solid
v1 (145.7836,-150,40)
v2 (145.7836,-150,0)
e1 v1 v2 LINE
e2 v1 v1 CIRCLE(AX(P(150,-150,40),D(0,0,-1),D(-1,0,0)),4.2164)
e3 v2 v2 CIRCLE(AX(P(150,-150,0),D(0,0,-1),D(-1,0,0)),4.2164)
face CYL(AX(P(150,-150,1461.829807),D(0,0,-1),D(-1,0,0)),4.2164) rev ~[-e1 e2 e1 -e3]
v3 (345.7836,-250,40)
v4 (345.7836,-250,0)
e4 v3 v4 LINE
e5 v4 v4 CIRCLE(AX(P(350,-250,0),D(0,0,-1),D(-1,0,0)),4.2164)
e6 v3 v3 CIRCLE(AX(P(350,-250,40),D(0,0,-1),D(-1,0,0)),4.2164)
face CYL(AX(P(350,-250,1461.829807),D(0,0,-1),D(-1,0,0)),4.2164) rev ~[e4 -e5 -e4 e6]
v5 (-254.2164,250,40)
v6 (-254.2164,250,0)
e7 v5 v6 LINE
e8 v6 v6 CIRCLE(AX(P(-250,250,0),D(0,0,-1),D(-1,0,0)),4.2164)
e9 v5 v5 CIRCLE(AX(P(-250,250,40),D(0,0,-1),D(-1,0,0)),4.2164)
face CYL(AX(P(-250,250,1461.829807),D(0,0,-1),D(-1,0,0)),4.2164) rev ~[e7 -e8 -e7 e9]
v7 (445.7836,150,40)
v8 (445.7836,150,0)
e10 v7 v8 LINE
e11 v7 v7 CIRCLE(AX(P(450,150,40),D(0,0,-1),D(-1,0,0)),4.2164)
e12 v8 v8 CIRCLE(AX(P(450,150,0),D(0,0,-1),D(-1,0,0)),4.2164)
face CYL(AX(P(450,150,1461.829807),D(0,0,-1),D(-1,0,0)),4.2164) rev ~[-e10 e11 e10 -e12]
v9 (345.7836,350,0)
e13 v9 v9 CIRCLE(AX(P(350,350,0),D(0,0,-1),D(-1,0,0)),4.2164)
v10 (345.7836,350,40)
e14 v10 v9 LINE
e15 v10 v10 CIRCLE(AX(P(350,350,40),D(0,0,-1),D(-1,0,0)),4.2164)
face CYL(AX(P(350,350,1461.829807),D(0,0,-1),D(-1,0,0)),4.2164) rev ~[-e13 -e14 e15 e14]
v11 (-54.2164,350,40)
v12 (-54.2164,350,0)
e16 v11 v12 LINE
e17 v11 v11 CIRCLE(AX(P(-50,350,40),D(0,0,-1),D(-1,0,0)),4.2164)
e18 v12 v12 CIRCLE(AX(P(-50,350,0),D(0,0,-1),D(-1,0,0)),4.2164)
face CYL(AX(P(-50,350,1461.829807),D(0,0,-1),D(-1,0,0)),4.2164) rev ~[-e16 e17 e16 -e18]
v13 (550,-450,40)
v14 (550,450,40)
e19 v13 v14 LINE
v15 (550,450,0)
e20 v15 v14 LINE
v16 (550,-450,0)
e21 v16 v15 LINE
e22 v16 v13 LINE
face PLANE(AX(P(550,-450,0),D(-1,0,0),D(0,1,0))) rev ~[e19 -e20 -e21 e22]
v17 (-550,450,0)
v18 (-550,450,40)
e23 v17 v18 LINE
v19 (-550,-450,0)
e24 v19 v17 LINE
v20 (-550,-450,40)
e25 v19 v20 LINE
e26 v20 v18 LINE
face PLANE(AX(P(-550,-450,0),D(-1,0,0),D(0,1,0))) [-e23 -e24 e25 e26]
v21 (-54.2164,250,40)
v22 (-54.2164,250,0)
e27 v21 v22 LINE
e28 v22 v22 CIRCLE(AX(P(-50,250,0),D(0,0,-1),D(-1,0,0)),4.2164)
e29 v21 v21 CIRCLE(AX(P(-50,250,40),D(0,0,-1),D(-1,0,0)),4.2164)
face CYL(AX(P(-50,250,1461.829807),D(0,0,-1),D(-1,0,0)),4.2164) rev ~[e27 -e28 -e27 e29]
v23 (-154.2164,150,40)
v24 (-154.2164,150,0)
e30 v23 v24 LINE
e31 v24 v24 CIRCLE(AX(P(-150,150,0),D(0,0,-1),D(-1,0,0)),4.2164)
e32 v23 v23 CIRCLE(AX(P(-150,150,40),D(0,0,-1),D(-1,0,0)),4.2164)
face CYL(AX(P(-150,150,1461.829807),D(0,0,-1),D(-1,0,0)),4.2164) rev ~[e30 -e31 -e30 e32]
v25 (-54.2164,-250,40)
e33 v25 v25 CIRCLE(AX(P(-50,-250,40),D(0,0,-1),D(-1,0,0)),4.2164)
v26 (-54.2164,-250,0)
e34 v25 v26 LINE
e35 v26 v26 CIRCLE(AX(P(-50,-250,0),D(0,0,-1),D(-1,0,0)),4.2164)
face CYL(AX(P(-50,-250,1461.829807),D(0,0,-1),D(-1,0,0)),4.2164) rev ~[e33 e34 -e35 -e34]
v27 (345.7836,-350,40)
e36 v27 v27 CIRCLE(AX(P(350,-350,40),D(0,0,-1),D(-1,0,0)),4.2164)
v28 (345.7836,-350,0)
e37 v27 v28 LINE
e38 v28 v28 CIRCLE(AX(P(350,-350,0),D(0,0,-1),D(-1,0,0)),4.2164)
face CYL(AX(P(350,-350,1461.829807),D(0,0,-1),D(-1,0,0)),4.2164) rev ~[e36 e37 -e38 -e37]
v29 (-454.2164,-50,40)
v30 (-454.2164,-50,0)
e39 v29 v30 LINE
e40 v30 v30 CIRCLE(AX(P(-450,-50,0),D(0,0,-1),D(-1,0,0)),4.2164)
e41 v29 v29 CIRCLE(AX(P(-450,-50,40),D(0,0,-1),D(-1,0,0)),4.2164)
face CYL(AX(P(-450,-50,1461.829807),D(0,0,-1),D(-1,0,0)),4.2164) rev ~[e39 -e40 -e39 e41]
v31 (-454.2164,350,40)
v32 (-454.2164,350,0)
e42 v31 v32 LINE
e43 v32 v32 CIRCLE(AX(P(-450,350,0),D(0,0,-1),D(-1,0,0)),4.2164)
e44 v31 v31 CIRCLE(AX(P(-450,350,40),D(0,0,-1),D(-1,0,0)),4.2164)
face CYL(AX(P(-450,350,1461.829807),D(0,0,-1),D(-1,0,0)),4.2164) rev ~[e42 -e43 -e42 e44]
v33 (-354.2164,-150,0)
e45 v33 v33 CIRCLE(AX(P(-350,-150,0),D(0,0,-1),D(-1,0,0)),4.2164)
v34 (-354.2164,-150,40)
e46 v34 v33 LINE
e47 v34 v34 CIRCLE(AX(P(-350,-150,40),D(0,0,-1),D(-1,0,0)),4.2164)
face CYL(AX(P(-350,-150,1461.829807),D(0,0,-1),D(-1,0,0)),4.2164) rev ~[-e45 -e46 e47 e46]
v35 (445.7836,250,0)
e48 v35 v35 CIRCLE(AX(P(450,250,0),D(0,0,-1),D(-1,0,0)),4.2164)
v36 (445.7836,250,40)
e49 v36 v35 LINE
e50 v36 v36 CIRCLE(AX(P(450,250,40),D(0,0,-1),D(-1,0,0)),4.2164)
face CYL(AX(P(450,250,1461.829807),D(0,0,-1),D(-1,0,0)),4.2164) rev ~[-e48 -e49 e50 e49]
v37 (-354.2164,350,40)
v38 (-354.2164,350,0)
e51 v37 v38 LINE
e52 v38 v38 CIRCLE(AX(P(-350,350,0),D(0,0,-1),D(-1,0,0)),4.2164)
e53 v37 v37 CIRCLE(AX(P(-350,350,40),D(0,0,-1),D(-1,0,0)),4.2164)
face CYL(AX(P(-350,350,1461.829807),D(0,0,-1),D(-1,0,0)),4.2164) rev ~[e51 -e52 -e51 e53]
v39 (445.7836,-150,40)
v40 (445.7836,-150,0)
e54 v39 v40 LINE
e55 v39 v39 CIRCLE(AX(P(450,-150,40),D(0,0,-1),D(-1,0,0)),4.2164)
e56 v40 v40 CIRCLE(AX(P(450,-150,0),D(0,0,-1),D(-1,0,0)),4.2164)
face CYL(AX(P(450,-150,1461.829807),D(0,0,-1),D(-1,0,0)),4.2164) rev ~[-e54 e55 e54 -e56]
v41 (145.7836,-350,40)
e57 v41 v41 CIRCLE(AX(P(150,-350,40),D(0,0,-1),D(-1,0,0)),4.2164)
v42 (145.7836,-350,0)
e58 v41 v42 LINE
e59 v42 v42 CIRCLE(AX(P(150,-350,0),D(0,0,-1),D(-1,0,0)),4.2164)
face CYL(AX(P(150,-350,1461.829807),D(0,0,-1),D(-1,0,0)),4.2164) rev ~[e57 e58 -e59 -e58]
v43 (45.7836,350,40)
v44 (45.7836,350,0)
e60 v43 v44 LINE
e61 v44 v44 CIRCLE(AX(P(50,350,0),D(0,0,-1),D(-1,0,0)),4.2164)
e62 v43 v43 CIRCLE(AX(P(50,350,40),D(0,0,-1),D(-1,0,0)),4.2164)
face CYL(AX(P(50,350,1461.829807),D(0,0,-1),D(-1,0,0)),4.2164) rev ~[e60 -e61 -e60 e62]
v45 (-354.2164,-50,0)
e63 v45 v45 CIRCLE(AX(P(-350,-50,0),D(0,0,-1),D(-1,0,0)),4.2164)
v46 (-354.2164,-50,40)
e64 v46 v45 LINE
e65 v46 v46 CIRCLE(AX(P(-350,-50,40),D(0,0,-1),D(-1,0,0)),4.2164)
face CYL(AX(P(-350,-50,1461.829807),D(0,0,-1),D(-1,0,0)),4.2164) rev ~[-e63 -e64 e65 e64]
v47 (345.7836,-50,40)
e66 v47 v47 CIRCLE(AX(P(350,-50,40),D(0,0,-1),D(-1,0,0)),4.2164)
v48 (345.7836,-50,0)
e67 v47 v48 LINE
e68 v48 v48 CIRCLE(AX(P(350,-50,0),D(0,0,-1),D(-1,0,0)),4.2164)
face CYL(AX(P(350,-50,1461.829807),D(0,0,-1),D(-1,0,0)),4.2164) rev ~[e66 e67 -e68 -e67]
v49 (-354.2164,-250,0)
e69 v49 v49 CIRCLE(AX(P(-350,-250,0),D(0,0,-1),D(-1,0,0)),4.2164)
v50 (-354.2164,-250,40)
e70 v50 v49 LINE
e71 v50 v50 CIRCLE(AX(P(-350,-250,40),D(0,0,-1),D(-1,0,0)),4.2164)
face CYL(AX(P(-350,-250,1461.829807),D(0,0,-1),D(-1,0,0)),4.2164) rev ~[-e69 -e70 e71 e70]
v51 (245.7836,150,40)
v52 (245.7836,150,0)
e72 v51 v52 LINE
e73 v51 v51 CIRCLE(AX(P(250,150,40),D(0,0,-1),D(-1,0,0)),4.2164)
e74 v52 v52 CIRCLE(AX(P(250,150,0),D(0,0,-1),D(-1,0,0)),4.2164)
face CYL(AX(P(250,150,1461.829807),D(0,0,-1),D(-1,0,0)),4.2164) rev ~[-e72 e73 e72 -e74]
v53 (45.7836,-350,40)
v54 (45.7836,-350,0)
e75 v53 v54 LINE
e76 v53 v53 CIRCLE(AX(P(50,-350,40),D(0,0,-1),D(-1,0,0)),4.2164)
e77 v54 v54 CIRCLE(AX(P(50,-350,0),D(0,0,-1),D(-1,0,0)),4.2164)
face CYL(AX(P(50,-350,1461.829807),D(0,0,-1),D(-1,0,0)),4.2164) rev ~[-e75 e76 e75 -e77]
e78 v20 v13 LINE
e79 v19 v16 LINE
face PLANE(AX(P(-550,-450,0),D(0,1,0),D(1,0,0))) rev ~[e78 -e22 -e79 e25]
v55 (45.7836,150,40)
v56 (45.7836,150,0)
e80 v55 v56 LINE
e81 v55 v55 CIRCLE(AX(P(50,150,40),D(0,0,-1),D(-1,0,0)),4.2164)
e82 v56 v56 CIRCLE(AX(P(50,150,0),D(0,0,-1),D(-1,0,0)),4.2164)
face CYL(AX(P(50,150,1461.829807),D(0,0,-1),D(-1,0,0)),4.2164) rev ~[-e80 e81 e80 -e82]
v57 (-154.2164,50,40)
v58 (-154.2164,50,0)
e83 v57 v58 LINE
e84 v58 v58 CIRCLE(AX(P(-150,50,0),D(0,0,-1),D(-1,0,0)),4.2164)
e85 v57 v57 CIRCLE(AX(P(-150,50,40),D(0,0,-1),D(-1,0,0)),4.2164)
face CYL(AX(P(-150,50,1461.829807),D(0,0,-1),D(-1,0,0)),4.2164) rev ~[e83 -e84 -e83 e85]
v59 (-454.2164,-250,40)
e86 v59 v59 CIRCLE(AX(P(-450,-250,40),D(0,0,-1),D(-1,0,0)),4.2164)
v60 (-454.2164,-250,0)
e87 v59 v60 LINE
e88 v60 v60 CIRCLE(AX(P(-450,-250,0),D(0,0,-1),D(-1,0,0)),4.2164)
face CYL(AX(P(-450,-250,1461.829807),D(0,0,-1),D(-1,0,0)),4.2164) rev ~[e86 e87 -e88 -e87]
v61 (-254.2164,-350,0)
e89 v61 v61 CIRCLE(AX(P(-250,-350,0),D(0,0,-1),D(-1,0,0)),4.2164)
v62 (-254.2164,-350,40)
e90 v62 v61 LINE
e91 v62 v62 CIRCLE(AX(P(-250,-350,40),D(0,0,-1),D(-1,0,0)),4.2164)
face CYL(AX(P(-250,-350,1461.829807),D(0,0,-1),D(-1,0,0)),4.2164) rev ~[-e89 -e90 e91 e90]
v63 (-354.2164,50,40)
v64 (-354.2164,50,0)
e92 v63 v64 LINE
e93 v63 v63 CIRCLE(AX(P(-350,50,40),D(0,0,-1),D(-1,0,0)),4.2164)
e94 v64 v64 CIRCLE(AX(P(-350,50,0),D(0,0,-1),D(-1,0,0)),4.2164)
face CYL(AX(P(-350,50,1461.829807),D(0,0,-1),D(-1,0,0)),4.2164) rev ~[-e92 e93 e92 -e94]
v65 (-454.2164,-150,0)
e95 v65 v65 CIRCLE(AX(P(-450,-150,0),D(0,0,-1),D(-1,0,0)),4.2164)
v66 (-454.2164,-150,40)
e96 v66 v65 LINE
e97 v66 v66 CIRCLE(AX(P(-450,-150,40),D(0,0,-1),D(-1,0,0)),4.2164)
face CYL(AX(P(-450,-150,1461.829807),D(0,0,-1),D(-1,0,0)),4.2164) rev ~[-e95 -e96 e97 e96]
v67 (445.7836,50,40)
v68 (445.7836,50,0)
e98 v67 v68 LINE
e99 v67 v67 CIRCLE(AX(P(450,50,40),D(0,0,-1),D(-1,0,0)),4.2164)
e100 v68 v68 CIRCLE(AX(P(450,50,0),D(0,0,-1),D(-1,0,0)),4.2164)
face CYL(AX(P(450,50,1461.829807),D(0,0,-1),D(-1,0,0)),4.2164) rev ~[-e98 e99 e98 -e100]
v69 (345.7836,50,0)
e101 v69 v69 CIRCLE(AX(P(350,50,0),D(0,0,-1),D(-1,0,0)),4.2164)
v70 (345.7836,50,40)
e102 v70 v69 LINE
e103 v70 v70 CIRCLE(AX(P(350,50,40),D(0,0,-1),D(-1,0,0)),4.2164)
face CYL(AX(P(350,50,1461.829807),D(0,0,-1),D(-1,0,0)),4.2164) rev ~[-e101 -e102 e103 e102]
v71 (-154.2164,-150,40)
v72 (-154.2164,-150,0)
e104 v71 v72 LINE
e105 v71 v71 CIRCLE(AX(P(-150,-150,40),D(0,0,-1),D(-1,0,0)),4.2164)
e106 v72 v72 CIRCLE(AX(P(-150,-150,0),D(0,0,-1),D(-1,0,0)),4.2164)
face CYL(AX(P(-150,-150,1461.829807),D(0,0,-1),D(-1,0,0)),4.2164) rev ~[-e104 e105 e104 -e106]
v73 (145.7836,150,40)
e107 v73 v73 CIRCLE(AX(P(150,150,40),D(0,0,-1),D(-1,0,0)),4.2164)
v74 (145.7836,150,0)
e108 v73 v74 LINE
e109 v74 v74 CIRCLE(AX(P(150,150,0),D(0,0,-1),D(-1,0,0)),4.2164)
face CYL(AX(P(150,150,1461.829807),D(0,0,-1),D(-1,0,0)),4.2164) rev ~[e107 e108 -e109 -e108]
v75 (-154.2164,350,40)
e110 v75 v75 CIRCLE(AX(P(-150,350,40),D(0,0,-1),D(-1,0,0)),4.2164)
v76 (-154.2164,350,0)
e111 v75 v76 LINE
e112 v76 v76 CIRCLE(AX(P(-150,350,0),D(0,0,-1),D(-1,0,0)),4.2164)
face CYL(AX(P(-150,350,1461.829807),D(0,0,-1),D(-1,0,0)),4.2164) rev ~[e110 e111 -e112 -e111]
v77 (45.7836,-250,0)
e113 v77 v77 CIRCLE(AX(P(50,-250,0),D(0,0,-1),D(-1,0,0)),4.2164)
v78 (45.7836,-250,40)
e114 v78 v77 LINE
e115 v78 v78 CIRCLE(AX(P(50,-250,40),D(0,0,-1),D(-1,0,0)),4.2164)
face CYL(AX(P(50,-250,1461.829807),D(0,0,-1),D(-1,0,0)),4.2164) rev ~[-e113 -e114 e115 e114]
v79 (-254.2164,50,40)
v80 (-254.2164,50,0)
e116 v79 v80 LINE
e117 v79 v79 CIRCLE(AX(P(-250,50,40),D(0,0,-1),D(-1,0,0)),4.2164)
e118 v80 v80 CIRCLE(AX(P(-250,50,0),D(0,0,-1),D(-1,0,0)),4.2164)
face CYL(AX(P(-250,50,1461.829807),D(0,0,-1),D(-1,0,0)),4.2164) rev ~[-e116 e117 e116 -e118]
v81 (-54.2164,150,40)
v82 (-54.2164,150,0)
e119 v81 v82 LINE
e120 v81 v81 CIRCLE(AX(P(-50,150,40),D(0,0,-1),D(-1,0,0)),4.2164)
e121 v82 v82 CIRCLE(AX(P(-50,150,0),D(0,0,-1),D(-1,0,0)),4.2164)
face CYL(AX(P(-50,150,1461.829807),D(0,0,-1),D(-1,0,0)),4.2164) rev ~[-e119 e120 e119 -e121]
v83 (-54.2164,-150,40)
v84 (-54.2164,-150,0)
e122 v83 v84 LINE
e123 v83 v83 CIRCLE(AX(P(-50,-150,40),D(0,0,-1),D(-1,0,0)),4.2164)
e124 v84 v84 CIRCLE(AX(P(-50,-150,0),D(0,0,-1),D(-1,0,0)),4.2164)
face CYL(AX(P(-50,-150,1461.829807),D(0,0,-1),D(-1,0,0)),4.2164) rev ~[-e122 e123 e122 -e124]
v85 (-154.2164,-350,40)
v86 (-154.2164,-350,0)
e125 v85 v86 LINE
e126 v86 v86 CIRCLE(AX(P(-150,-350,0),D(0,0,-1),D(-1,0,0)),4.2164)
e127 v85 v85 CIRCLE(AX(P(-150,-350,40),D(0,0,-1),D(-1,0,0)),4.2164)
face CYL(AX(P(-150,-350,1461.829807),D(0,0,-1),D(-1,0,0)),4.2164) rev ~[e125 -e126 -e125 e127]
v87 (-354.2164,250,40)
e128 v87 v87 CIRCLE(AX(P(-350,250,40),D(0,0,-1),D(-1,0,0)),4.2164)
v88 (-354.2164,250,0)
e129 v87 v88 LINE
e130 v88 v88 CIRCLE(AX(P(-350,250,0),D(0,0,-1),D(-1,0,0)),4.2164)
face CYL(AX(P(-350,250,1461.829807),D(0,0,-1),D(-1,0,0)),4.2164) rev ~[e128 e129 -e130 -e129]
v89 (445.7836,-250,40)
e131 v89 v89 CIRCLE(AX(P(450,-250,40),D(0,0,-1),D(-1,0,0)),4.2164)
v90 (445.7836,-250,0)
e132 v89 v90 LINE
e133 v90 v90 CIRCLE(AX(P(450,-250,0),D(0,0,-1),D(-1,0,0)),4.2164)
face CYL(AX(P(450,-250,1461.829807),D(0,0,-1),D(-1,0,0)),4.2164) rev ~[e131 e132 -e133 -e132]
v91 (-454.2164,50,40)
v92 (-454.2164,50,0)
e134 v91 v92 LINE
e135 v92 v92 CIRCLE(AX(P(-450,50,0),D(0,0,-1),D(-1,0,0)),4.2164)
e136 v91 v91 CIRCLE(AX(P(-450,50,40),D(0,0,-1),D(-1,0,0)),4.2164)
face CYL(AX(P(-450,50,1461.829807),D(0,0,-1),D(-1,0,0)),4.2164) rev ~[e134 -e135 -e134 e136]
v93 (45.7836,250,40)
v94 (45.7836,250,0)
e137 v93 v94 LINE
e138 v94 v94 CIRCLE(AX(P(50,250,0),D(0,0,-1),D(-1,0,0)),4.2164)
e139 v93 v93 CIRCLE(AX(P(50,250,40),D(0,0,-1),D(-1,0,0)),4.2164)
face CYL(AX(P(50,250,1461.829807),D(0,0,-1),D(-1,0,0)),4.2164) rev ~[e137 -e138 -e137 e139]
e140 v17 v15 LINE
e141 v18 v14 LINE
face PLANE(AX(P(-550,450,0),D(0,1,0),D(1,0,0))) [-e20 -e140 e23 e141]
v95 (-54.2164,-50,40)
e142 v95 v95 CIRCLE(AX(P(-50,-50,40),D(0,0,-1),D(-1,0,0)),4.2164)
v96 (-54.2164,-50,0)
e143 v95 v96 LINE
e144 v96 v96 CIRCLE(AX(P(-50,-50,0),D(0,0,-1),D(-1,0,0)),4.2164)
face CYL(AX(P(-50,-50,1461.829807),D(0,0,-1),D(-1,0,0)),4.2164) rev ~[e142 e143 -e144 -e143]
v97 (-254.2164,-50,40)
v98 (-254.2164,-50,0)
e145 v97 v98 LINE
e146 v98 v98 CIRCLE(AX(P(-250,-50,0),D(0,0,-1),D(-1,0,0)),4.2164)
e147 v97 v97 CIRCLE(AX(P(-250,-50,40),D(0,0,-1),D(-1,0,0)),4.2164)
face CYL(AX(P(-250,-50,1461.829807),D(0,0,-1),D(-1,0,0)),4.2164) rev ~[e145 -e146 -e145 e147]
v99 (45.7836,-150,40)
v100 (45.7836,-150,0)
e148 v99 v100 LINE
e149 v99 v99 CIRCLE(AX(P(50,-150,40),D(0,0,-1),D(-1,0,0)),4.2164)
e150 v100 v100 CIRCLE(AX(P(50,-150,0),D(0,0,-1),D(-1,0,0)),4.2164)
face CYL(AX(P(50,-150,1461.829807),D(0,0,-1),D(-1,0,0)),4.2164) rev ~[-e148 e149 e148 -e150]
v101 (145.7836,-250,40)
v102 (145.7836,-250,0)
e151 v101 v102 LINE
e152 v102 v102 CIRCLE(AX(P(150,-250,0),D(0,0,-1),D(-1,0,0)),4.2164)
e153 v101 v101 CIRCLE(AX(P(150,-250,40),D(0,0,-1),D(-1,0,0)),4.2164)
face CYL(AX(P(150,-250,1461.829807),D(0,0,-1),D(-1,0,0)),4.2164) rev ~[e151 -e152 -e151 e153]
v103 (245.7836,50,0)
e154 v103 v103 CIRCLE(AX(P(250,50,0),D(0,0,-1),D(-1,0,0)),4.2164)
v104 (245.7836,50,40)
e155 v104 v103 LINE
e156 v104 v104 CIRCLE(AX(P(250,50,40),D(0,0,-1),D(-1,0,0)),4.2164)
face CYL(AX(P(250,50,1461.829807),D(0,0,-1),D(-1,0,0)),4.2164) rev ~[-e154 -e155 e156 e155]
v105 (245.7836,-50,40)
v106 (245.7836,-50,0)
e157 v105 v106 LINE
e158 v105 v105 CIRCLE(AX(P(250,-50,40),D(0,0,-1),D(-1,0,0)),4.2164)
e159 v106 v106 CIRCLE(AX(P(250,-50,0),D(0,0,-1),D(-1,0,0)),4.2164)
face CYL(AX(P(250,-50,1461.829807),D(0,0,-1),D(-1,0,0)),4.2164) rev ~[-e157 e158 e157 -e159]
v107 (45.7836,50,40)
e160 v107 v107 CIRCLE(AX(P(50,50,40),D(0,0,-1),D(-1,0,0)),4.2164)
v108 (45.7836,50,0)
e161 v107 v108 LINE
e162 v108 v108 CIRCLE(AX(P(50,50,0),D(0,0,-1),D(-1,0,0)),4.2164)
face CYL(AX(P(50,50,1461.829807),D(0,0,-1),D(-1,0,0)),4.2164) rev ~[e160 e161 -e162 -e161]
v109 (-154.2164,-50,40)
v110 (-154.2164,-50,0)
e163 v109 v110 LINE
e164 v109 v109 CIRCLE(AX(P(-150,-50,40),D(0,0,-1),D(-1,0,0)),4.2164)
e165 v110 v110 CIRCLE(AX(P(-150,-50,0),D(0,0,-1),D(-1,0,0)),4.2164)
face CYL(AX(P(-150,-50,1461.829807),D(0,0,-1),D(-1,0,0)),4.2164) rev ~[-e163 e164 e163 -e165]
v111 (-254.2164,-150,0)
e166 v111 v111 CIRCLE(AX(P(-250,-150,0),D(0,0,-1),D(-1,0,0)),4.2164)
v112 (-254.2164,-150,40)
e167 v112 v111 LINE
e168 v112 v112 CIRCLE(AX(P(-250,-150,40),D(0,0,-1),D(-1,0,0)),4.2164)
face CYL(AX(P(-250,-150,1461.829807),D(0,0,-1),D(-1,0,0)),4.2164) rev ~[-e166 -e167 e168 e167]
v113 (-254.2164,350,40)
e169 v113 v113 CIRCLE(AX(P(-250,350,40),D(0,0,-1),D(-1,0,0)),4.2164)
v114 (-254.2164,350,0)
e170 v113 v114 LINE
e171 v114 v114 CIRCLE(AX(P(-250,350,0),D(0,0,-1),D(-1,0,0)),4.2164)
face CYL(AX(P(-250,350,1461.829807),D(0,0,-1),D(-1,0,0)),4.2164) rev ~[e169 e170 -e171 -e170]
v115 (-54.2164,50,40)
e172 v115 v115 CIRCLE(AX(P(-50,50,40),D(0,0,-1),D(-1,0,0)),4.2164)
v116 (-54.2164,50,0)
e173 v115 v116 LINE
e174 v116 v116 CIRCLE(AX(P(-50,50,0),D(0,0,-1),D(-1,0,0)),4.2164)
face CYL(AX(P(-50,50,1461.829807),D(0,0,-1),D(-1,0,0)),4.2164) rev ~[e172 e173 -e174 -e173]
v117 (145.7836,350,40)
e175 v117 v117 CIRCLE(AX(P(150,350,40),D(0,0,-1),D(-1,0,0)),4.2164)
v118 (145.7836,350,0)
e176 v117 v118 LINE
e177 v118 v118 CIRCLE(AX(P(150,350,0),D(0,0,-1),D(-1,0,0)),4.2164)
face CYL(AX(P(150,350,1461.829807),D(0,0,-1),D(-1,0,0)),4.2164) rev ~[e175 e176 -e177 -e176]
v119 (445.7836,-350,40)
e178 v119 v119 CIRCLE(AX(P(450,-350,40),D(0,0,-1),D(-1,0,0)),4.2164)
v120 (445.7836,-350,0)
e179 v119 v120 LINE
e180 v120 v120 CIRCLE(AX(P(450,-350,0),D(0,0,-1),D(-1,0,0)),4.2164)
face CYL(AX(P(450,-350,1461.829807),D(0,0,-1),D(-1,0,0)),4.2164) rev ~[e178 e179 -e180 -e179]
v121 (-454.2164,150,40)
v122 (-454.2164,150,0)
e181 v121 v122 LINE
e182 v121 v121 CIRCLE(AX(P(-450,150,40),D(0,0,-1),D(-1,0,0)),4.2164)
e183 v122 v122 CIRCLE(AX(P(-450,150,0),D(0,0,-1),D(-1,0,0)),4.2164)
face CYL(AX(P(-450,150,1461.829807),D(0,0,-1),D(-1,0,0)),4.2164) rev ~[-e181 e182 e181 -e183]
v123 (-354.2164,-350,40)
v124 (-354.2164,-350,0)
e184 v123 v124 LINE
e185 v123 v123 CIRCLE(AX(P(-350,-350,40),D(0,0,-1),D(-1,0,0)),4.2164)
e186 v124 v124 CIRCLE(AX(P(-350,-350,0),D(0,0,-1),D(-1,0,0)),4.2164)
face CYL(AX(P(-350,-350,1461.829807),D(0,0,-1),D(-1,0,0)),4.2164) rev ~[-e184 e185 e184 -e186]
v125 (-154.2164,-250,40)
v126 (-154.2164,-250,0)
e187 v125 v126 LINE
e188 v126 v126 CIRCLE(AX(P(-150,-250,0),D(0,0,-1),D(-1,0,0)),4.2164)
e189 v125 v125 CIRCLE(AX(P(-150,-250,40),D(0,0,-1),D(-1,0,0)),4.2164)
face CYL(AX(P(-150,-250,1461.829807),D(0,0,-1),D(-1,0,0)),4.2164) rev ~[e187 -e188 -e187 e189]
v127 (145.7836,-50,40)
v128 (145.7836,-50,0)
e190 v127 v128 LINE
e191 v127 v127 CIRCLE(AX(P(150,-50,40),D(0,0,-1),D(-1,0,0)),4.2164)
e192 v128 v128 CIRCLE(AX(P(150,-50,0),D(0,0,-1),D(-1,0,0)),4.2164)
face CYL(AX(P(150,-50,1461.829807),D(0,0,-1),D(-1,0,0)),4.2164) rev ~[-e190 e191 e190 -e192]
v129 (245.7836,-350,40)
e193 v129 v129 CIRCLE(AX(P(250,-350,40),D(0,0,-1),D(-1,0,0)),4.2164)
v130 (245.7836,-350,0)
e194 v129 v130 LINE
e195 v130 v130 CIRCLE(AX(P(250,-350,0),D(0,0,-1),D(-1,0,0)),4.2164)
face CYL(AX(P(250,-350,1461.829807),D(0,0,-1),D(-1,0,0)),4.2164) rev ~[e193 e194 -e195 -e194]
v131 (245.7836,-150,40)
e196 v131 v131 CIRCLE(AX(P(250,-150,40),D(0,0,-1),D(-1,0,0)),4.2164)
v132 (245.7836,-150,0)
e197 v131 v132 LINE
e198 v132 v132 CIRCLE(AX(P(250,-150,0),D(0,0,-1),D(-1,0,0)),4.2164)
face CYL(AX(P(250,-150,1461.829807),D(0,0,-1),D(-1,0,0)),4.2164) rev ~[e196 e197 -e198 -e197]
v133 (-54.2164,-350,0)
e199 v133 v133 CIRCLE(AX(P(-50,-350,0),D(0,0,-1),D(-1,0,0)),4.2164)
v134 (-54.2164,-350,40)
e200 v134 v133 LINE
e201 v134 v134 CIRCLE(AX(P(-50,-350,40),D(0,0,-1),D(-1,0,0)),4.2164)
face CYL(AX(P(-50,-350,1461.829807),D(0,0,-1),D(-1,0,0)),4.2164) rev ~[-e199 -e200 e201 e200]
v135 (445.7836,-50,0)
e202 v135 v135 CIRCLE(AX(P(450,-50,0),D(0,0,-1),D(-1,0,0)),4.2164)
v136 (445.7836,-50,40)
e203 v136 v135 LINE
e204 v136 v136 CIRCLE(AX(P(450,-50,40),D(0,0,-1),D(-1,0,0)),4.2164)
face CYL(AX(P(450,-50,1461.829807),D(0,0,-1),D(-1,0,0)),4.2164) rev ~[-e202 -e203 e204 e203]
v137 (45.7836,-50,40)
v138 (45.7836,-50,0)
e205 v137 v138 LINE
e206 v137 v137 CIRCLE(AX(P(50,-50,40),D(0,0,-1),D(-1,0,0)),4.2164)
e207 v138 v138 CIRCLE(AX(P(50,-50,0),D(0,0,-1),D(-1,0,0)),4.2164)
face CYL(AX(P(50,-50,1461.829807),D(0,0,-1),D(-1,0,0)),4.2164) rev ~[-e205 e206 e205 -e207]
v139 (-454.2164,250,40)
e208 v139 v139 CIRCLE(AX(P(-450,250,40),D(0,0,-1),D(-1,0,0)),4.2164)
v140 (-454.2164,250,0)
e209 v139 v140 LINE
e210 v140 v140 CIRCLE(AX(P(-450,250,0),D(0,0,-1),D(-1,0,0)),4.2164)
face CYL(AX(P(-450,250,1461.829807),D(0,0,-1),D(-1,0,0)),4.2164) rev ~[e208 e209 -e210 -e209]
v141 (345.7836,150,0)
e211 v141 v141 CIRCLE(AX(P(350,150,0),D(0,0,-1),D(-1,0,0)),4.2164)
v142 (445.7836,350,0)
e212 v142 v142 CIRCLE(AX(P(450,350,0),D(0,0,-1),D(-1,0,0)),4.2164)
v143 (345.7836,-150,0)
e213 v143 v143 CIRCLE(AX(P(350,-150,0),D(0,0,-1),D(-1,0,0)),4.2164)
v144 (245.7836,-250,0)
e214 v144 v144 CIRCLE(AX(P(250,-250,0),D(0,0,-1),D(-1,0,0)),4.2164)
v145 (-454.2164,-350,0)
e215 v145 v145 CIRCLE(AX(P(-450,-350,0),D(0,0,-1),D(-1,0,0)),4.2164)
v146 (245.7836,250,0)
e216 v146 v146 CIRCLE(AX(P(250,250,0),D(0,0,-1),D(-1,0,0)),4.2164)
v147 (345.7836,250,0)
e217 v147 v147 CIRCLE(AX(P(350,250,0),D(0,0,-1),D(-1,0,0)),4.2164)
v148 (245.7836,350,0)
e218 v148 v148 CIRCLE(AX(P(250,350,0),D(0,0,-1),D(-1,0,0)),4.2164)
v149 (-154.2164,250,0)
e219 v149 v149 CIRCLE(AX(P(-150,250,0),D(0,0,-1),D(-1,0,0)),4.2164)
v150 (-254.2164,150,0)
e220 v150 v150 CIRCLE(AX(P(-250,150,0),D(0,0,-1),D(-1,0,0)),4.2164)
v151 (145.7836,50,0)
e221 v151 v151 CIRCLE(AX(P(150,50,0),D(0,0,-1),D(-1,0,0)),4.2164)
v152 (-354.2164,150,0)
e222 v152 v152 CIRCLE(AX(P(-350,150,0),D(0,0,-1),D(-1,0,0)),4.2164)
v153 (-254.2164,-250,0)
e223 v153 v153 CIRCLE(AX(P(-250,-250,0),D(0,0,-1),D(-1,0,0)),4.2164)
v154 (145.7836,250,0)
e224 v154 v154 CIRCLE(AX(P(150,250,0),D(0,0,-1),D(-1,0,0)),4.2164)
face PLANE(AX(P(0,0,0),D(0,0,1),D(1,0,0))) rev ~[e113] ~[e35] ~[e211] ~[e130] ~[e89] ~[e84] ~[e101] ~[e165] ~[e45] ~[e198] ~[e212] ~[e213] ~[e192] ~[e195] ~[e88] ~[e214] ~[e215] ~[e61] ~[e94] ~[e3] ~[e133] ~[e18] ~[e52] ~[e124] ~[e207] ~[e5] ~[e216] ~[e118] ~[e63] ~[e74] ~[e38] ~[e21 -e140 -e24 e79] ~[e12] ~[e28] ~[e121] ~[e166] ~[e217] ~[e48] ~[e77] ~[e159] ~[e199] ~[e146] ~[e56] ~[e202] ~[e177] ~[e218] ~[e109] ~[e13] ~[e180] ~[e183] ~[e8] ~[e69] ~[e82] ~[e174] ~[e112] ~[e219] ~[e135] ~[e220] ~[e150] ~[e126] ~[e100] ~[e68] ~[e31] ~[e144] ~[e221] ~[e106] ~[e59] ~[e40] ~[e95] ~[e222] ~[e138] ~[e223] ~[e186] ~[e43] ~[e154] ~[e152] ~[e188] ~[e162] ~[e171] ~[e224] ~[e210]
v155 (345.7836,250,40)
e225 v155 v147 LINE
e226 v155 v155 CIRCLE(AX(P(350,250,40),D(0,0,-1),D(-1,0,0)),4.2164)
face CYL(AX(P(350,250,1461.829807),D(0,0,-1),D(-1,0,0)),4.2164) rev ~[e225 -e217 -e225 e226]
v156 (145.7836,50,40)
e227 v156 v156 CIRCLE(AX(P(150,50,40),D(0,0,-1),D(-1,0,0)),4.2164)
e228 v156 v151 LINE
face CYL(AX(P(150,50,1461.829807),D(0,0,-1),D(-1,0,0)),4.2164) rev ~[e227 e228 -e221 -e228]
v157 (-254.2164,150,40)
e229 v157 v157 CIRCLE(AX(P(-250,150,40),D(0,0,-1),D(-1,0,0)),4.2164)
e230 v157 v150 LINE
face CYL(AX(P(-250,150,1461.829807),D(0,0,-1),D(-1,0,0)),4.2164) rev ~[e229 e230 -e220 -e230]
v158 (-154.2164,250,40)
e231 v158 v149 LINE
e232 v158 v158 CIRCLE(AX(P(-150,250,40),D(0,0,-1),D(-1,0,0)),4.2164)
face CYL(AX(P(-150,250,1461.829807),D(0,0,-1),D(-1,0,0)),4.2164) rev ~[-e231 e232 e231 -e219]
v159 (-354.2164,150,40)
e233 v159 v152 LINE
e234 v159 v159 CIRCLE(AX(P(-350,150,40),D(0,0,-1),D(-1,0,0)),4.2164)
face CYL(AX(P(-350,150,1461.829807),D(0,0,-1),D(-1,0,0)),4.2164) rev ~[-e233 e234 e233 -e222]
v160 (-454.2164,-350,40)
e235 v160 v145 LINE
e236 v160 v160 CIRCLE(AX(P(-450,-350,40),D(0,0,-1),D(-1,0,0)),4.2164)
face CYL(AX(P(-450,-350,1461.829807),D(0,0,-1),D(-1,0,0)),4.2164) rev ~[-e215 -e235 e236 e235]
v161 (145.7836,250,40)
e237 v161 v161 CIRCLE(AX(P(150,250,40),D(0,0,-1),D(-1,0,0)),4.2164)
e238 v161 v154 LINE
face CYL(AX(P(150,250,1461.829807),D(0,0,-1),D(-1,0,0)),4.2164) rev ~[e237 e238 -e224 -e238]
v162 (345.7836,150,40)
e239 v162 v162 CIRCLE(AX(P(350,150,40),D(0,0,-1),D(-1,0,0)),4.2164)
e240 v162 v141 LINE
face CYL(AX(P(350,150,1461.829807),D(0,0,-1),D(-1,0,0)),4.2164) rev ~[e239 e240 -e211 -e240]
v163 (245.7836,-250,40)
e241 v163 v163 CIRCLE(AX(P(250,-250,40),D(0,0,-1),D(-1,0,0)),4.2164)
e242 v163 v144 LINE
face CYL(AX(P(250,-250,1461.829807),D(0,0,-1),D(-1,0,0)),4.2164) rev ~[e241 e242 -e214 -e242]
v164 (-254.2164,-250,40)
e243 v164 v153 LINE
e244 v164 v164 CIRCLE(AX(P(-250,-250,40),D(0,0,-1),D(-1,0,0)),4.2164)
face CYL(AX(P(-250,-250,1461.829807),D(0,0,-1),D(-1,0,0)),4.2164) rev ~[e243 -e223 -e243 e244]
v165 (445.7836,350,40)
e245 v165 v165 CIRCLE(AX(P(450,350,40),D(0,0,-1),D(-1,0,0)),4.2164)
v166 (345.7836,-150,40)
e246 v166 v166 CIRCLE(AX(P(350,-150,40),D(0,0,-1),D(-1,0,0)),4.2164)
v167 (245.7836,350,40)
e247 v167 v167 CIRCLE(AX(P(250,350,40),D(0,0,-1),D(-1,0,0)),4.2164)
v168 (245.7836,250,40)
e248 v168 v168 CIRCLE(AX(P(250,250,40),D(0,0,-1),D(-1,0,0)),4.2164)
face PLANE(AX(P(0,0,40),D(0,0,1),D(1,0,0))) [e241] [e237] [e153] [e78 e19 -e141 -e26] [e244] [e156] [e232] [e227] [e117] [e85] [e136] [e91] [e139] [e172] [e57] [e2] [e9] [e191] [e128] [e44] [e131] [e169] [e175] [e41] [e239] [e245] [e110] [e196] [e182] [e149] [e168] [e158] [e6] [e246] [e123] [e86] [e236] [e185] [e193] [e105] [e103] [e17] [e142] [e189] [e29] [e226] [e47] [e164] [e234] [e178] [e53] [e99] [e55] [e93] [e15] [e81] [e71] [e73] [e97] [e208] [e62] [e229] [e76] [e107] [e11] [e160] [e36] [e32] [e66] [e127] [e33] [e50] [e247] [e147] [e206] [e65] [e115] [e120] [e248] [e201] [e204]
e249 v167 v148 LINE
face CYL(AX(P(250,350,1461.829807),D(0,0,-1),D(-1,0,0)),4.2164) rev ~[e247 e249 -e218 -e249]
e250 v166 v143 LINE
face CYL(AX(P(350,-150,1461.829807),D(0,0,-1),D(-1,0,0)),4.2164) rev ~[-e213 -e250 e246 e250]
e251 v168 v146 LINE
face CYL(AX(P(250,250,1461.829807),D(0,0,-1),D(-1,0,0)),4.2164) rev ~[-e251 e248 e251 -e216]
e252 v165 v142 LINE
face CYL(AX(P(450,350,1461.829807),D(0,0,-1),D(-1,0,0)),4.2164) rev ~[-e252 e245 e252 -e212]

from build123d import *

# Parameters (mm, degrees)
F0_W     = 1100
F0_H     = 900
F1_DEPTH = 40
F3_D     = 8.4328


with BuildPart() as f1:
    # F0 (on Top) → F1 (new body)
    with BuildSketch(Plane.XY):
        Rectangle(F0_W, F0_H)
    extrude(amount=F1_DEPTH)

    # F3 (through all)
    with Locations(Plane.XY.offset(40)):
        with Locations((-450, -350), (-350, -350), (-250, -350), (-450, -250), (-350, -250), (-250, -250), (-150, -150), (-50, -250), (-150, -350), (-250, -150), (-150, -250), (350, -50), (-450, 150), (-450, -50), (-450, 50), (-450, 250), (-450, 350), (450, 50), (250, 50), (50, 50), (-150, 50), (150, 350), (-50, 350), (-250, 350), (350, 350), (150, 150), (-50, 150), (-250, 150), (350, 150), (150, -50), (-50, -50), (-250, -50), (450, -150), (350, -250), (250, -150), (150, -250), (50, -150), (-350, 350), (450, 350), (250, 350), (50, 350), (-150, 350), (-350, 150), (450, 150), (250, 150), (50, 150), (-150, 150), (250, -350), (50, -350), (450, -350), (150, 250), (-50, 250), (-250, 250), (350, 250), (150, 50), (-50, 50), (-250, 50), (350, 50), (450, -50), (250, -50), (350, -150), (50, -50), (150, -150), (-150, -50), (-50, -150), (450, -250), (250, -250), (350, -350), (50, -250), (150, -350), (-50, -350), (-350, 250), (-350, -150), (-350, -50), (450, 250), (250, 250), (50, 250), (-150, 250), (-350, 50), (-450, -150)):
            Hole(F3_D / 2)


solid = f1.part
